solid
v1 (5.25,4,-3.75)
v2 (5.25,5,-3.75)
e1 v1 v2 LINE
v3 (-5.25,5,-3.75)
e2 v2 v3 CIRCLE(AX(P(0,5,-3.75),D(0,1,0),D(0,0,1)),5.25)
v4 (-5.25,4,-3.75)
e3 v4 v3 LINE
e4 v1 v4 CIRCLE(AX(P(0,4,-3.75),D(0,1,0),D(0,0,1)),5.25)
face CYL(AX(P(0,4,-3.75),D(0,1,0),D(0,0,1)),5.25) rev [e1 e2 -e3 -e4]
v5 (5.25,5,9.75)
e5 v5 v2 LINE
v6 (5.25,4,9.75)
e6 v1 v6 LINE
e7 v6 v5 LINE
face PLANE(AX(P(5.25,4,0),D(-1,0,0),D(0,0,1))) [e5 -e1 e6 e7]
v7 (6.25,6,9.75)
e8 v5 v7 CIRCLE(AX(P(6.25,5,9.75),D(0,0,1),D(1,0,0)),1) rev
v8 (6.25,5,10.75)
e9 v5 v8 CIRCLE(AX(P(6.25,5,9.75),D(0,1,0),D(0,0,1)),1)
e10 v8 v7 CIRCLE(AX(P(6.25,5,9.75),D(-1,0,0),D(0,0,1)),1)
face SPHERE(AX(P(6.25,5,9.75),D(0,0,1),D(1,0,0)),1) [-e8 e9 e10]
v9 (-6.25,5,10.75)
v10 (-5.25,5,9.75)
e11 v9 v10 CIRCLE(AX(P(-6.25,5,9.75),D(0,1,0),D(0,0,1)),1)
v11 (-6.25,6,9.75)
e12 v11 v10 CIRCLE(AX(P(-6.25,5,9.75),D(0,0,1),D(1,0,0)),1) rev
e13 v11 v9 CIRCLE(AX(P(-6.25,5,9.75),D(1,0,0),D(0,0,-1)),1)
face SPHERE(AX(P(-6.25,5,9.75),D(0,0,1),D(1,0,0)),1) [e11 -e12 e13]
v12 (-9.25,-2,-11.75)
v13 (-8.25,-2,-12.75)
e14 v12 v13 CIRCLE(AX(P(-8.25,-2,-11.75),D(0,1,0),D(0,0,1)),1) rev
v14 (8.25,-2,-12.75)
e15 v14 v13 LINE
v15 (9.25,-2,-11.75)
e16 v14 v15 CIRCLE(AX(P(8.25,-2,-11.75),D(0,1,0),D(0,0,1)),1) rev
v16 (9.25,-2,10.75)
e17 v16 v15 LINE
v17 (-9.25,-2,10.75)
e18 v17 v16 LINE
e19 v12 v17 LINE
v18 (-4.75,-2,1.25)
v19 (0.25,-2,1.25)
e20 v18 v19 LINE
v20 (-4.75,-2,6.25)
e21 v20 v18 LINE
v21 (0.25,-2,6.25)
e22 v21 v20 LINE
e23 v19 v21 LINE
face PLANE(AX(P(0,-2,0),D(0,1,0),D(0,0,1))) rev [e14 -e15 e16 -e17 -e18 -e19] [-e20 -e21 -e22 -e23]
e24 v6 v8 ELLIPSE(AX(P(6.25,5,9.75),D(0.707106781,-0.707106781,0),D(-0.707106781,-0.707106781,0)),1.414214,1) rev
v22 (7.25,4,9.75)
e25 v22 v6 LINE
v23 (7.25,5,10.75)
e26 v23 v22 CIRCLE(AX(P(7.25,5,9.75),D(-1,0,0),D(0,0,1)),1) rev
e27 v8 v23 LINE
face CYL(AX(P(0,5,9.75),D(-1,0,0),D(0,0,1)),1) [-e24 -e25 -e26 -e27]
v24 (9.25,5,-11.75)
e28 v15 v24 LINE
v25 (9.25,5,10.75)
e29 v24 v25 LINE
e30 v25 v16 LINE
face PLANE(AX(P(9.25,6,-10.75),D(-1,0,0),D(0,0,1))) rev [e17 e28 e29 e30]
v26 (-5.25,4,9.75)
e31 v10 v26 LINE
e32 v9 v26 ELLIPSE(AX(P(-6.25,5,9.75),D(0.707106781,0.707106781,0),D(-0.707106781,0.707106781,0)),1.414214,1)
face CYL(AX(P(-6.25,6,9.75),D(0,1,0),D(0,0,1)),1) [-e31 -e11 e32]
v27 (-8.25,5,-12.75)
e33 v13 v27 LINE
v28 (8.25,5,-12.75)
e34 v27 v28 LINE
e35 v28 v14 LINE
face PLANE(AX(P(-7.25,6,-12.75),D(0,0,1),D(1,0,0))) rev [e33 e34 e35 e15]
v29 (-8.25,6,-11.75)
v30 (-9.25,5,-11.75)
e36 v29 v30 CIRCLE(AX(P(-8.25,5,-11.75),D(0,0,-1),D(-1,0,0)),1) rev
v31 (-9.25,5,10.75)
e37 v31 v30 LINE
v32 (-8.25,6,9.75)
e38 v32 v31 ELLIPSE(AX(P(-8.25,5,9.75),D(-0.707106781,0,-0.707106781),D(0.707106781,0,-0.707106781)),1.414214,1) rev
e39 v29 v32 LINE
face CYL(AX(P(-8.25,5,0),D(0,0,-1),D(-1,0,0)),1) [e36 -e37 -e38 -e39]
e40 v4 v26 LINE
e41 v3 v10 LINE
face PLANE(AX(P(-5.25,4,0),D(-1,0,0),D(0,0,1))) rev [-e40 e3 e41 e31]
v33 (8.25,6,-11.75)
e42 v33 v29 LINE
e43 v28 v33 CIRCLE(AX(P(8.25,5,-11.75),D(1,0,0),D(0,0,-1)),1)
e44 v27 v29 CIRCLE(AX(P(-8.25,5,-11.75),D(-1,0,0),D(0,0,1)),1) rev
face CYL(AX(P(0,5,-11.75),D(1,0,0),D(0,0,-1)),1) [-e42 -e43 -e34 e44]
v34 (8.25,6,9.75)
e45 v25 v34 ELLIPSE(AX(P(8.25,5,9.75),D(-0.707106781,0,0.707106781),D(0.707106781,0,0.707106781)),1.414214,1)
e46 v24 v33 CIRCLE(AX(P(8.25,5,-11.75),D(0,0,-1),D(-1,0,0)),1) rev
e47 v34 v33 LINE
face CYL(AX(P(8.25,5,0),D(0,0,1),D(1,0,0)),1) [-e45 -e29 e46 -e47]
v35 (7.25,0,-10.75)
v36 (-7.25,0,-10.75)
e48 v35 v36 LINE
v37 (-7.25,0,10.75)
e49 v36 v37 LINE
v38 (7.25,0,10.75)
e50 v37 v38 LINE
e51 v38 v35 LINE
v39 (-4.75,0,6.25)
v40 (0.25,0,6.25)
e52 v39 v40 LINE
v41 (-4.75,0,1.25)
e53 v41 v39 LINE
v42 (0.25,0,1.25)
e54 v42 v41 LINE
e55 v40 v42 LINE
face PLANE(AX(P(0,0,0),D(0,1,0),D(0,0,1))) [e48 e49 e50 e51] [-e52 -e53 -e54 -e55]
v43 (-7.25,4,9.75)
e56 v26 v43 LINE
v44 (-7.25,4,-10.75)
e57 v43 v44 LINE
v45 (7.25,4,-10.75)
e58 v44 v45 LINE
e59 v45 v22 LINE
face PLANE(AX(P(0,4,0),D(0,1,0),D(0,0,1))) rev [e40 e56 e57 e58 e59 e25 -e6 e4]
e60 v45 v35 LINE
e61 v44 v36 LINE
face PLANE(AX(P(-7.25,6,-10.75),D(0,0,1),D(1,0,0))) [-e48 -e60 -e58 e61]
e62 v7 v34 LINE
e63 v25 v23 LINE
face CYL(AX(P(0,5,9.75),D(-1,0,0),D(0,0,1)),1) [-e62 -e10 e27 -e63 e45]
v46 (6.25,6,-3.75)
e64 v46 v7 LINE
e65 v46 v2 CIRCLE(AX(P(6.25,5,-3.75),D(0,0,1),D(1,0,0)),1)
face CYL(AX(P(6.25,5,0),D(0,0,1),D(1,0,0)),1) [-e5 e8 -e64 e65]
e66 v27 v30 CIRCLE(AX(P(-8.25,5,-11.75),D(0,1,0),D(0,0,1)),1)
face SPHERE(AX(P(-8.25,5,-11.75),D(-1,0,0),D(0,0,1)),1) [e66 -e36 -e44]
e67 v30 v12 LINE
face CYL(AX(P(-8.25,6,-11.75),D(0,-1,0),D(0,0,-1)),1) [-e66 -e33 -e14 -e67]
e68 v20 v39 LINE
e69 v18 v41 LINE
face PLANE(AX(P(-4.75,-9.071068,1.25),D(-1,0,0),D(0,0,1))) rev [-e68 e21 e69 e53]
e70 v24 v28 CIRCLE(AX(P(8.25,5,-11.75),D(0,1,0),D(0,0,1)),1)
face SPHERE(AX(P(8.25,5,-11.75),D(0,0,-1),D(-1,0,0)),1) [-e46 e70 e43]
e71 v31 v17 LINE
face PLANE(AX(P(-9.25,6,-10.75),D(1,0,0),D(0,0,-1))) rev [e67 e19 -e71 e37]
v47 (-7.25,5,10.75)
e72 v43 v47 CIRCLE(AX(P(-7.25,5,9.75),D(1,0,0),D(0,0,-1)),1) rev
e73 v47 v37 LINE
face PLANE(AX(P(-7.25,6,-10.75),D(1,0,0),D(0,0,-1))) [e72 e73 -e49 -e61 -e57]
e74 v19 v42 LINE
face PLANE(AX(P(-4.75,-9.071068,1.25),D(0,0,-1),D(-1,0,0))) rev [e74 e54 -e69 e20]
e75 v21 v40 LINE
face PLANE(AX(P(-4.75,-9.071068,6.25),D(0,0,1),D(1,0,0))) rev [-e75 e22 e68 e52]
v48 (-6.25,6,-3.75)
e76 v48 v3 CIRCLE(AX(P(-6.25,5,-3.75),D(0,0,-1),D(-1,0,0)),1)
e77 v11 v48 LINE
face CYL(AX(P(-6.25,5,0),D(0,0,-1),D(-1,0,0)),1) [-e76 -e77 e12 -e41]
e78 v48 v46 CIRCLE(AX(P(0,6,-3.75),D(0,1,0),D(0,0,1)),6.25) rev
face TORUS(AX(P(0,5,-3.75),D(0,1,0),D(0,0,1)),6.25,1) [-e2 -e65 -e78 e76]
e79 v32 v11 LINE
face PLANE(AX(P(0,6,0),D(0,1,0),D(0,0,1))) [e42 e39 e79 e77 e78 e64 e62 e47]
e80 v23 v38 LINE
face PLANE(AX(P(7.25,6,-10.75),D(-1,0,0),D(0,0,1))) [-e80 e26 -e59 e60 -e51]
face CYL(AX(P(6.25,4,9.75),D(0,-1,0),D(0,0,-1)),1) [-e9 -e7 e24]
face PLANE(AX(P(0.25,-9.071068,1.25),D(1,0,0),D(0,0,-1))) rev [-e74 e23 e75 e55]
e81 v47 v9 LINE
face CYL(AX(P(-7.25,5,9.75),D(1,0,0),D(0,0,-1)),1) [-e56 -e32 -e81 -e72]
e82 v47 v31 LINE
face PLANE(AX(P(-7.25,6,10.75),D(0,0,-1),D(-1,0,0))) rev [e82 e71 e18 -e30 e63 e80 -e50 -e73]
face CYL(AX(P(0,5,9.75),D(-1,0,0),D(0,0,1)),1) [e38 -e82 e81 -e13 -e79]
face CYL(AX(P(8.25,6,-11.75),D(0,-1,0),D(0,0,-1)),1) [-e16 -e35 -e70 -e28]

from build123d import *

# Parameters (mm, degrees)
SKETCH1_W           = 14.5
SKETCH1_H           = 21.5
BOSS_EXTRUDE1_DEPTH = 6
SHELL1_T            = 2
SKETCH3_W           = 2
SKETCH3_H           = 14.5
BOSS_EXTRUDE3_DEPTH = 2
SKETCH4_W           = 5
SKETCH4_H           = 5
CUT_EXTRUDE1_DEPTH  = 2
FILLET1_R           = 1


with BuildPart() as part:
    # Sketch1 → Boss-Extrude1 (new body)
    with BuildSketch(Plane(origin=(0, 0, 0), x_dir=(1, 0, 0), z_dir=(0, 1, 0))):
        Rectangle(SKETCH1_W, SKETCH1_H)
    extrude(amount=BOSS_EXTRUDE1_DEPTH)

    # Shell1
    shell1_openings = [part.faces().sort_by_distance(p)[0] for p in [
        (0, 3, 10.75),
        (0, 6, 0),
    ]]
    offset(amount=SHELL1_T, openings=shell1_openings, kind=Kind.INTERSECTION)

    # Sketch3 → Boss-Extrude3 (add)
    with BuildSketch(Plane(origin=(0, 6, 0), x_dir=(1, 0, 0), z_dir=(0, 1, 0))):
        with BuildLine():
            Line((-7.25, 10.75), (-7.25, 3.75))
            Line((-7.25, 3.75), (-5.25, 3.75))
            ThreePointArc((-5.25, 3.75), (0, 9), (5.25, 3.75))
            Line((5.25, 3.75), (7.25, 3.75))
            Line((7.25, 3.75), (7.25, 10.75))
            Line((7.25, 10.75), (-7.25, 10.75))
        make_face()
        with Locations((-6.25, -3.5)):
            Rectangle(SKETCH3_W, SKETCH3_H)
        with Locations((6.25, -3.5)):
            Rectangle(SKETCH3_W, SKETCH3_H)
    extrude(amount=-BOSS_EXTRUDE3_DEPTH)

    # Sketch4 → Cut-Extrude1 (cut)
    with BuildSketch(Plane(origin=(0, 0, 0), x_dir=(1, 0, 0), z_dir=(0, 1, 0))):
        with Locations((-2.25, -3.75)):
            Rectangle(SKETCH4_W, SKETCH4_H)
    extrude(amount=-CUT_EXTRUDE1_DEPTH, mode=Mode.SUBTRACT)

    # Fillet1
    fillet1_edges = [part.edges().sort_by_distance(p)[0] for p in [
        (-9.25, 6, -1),
        (-7.25, 6, 10.75),
        (7.25, 6, 10.75),
        (0, 6, -9),
        (-5.25, 6, 3.5),
        (-6.25, 4, 10.75),
        (-5.25, 5, 10.75),
        (5.25, 5, 10.75),
        (6.25, 4, 10.75),
        (5.25, 6, 3.5),
        (9.25, 6, -1),
        (-9.25, 2, -12.75),
        (9.25, 2, -12.75),
        (0, 6, -12.75),
    ]]
    fillet(fillet1_edges, radius=FILLET1_R - 0.0001)  # a hair under: the kernel refuses the full size


solid = part.part
